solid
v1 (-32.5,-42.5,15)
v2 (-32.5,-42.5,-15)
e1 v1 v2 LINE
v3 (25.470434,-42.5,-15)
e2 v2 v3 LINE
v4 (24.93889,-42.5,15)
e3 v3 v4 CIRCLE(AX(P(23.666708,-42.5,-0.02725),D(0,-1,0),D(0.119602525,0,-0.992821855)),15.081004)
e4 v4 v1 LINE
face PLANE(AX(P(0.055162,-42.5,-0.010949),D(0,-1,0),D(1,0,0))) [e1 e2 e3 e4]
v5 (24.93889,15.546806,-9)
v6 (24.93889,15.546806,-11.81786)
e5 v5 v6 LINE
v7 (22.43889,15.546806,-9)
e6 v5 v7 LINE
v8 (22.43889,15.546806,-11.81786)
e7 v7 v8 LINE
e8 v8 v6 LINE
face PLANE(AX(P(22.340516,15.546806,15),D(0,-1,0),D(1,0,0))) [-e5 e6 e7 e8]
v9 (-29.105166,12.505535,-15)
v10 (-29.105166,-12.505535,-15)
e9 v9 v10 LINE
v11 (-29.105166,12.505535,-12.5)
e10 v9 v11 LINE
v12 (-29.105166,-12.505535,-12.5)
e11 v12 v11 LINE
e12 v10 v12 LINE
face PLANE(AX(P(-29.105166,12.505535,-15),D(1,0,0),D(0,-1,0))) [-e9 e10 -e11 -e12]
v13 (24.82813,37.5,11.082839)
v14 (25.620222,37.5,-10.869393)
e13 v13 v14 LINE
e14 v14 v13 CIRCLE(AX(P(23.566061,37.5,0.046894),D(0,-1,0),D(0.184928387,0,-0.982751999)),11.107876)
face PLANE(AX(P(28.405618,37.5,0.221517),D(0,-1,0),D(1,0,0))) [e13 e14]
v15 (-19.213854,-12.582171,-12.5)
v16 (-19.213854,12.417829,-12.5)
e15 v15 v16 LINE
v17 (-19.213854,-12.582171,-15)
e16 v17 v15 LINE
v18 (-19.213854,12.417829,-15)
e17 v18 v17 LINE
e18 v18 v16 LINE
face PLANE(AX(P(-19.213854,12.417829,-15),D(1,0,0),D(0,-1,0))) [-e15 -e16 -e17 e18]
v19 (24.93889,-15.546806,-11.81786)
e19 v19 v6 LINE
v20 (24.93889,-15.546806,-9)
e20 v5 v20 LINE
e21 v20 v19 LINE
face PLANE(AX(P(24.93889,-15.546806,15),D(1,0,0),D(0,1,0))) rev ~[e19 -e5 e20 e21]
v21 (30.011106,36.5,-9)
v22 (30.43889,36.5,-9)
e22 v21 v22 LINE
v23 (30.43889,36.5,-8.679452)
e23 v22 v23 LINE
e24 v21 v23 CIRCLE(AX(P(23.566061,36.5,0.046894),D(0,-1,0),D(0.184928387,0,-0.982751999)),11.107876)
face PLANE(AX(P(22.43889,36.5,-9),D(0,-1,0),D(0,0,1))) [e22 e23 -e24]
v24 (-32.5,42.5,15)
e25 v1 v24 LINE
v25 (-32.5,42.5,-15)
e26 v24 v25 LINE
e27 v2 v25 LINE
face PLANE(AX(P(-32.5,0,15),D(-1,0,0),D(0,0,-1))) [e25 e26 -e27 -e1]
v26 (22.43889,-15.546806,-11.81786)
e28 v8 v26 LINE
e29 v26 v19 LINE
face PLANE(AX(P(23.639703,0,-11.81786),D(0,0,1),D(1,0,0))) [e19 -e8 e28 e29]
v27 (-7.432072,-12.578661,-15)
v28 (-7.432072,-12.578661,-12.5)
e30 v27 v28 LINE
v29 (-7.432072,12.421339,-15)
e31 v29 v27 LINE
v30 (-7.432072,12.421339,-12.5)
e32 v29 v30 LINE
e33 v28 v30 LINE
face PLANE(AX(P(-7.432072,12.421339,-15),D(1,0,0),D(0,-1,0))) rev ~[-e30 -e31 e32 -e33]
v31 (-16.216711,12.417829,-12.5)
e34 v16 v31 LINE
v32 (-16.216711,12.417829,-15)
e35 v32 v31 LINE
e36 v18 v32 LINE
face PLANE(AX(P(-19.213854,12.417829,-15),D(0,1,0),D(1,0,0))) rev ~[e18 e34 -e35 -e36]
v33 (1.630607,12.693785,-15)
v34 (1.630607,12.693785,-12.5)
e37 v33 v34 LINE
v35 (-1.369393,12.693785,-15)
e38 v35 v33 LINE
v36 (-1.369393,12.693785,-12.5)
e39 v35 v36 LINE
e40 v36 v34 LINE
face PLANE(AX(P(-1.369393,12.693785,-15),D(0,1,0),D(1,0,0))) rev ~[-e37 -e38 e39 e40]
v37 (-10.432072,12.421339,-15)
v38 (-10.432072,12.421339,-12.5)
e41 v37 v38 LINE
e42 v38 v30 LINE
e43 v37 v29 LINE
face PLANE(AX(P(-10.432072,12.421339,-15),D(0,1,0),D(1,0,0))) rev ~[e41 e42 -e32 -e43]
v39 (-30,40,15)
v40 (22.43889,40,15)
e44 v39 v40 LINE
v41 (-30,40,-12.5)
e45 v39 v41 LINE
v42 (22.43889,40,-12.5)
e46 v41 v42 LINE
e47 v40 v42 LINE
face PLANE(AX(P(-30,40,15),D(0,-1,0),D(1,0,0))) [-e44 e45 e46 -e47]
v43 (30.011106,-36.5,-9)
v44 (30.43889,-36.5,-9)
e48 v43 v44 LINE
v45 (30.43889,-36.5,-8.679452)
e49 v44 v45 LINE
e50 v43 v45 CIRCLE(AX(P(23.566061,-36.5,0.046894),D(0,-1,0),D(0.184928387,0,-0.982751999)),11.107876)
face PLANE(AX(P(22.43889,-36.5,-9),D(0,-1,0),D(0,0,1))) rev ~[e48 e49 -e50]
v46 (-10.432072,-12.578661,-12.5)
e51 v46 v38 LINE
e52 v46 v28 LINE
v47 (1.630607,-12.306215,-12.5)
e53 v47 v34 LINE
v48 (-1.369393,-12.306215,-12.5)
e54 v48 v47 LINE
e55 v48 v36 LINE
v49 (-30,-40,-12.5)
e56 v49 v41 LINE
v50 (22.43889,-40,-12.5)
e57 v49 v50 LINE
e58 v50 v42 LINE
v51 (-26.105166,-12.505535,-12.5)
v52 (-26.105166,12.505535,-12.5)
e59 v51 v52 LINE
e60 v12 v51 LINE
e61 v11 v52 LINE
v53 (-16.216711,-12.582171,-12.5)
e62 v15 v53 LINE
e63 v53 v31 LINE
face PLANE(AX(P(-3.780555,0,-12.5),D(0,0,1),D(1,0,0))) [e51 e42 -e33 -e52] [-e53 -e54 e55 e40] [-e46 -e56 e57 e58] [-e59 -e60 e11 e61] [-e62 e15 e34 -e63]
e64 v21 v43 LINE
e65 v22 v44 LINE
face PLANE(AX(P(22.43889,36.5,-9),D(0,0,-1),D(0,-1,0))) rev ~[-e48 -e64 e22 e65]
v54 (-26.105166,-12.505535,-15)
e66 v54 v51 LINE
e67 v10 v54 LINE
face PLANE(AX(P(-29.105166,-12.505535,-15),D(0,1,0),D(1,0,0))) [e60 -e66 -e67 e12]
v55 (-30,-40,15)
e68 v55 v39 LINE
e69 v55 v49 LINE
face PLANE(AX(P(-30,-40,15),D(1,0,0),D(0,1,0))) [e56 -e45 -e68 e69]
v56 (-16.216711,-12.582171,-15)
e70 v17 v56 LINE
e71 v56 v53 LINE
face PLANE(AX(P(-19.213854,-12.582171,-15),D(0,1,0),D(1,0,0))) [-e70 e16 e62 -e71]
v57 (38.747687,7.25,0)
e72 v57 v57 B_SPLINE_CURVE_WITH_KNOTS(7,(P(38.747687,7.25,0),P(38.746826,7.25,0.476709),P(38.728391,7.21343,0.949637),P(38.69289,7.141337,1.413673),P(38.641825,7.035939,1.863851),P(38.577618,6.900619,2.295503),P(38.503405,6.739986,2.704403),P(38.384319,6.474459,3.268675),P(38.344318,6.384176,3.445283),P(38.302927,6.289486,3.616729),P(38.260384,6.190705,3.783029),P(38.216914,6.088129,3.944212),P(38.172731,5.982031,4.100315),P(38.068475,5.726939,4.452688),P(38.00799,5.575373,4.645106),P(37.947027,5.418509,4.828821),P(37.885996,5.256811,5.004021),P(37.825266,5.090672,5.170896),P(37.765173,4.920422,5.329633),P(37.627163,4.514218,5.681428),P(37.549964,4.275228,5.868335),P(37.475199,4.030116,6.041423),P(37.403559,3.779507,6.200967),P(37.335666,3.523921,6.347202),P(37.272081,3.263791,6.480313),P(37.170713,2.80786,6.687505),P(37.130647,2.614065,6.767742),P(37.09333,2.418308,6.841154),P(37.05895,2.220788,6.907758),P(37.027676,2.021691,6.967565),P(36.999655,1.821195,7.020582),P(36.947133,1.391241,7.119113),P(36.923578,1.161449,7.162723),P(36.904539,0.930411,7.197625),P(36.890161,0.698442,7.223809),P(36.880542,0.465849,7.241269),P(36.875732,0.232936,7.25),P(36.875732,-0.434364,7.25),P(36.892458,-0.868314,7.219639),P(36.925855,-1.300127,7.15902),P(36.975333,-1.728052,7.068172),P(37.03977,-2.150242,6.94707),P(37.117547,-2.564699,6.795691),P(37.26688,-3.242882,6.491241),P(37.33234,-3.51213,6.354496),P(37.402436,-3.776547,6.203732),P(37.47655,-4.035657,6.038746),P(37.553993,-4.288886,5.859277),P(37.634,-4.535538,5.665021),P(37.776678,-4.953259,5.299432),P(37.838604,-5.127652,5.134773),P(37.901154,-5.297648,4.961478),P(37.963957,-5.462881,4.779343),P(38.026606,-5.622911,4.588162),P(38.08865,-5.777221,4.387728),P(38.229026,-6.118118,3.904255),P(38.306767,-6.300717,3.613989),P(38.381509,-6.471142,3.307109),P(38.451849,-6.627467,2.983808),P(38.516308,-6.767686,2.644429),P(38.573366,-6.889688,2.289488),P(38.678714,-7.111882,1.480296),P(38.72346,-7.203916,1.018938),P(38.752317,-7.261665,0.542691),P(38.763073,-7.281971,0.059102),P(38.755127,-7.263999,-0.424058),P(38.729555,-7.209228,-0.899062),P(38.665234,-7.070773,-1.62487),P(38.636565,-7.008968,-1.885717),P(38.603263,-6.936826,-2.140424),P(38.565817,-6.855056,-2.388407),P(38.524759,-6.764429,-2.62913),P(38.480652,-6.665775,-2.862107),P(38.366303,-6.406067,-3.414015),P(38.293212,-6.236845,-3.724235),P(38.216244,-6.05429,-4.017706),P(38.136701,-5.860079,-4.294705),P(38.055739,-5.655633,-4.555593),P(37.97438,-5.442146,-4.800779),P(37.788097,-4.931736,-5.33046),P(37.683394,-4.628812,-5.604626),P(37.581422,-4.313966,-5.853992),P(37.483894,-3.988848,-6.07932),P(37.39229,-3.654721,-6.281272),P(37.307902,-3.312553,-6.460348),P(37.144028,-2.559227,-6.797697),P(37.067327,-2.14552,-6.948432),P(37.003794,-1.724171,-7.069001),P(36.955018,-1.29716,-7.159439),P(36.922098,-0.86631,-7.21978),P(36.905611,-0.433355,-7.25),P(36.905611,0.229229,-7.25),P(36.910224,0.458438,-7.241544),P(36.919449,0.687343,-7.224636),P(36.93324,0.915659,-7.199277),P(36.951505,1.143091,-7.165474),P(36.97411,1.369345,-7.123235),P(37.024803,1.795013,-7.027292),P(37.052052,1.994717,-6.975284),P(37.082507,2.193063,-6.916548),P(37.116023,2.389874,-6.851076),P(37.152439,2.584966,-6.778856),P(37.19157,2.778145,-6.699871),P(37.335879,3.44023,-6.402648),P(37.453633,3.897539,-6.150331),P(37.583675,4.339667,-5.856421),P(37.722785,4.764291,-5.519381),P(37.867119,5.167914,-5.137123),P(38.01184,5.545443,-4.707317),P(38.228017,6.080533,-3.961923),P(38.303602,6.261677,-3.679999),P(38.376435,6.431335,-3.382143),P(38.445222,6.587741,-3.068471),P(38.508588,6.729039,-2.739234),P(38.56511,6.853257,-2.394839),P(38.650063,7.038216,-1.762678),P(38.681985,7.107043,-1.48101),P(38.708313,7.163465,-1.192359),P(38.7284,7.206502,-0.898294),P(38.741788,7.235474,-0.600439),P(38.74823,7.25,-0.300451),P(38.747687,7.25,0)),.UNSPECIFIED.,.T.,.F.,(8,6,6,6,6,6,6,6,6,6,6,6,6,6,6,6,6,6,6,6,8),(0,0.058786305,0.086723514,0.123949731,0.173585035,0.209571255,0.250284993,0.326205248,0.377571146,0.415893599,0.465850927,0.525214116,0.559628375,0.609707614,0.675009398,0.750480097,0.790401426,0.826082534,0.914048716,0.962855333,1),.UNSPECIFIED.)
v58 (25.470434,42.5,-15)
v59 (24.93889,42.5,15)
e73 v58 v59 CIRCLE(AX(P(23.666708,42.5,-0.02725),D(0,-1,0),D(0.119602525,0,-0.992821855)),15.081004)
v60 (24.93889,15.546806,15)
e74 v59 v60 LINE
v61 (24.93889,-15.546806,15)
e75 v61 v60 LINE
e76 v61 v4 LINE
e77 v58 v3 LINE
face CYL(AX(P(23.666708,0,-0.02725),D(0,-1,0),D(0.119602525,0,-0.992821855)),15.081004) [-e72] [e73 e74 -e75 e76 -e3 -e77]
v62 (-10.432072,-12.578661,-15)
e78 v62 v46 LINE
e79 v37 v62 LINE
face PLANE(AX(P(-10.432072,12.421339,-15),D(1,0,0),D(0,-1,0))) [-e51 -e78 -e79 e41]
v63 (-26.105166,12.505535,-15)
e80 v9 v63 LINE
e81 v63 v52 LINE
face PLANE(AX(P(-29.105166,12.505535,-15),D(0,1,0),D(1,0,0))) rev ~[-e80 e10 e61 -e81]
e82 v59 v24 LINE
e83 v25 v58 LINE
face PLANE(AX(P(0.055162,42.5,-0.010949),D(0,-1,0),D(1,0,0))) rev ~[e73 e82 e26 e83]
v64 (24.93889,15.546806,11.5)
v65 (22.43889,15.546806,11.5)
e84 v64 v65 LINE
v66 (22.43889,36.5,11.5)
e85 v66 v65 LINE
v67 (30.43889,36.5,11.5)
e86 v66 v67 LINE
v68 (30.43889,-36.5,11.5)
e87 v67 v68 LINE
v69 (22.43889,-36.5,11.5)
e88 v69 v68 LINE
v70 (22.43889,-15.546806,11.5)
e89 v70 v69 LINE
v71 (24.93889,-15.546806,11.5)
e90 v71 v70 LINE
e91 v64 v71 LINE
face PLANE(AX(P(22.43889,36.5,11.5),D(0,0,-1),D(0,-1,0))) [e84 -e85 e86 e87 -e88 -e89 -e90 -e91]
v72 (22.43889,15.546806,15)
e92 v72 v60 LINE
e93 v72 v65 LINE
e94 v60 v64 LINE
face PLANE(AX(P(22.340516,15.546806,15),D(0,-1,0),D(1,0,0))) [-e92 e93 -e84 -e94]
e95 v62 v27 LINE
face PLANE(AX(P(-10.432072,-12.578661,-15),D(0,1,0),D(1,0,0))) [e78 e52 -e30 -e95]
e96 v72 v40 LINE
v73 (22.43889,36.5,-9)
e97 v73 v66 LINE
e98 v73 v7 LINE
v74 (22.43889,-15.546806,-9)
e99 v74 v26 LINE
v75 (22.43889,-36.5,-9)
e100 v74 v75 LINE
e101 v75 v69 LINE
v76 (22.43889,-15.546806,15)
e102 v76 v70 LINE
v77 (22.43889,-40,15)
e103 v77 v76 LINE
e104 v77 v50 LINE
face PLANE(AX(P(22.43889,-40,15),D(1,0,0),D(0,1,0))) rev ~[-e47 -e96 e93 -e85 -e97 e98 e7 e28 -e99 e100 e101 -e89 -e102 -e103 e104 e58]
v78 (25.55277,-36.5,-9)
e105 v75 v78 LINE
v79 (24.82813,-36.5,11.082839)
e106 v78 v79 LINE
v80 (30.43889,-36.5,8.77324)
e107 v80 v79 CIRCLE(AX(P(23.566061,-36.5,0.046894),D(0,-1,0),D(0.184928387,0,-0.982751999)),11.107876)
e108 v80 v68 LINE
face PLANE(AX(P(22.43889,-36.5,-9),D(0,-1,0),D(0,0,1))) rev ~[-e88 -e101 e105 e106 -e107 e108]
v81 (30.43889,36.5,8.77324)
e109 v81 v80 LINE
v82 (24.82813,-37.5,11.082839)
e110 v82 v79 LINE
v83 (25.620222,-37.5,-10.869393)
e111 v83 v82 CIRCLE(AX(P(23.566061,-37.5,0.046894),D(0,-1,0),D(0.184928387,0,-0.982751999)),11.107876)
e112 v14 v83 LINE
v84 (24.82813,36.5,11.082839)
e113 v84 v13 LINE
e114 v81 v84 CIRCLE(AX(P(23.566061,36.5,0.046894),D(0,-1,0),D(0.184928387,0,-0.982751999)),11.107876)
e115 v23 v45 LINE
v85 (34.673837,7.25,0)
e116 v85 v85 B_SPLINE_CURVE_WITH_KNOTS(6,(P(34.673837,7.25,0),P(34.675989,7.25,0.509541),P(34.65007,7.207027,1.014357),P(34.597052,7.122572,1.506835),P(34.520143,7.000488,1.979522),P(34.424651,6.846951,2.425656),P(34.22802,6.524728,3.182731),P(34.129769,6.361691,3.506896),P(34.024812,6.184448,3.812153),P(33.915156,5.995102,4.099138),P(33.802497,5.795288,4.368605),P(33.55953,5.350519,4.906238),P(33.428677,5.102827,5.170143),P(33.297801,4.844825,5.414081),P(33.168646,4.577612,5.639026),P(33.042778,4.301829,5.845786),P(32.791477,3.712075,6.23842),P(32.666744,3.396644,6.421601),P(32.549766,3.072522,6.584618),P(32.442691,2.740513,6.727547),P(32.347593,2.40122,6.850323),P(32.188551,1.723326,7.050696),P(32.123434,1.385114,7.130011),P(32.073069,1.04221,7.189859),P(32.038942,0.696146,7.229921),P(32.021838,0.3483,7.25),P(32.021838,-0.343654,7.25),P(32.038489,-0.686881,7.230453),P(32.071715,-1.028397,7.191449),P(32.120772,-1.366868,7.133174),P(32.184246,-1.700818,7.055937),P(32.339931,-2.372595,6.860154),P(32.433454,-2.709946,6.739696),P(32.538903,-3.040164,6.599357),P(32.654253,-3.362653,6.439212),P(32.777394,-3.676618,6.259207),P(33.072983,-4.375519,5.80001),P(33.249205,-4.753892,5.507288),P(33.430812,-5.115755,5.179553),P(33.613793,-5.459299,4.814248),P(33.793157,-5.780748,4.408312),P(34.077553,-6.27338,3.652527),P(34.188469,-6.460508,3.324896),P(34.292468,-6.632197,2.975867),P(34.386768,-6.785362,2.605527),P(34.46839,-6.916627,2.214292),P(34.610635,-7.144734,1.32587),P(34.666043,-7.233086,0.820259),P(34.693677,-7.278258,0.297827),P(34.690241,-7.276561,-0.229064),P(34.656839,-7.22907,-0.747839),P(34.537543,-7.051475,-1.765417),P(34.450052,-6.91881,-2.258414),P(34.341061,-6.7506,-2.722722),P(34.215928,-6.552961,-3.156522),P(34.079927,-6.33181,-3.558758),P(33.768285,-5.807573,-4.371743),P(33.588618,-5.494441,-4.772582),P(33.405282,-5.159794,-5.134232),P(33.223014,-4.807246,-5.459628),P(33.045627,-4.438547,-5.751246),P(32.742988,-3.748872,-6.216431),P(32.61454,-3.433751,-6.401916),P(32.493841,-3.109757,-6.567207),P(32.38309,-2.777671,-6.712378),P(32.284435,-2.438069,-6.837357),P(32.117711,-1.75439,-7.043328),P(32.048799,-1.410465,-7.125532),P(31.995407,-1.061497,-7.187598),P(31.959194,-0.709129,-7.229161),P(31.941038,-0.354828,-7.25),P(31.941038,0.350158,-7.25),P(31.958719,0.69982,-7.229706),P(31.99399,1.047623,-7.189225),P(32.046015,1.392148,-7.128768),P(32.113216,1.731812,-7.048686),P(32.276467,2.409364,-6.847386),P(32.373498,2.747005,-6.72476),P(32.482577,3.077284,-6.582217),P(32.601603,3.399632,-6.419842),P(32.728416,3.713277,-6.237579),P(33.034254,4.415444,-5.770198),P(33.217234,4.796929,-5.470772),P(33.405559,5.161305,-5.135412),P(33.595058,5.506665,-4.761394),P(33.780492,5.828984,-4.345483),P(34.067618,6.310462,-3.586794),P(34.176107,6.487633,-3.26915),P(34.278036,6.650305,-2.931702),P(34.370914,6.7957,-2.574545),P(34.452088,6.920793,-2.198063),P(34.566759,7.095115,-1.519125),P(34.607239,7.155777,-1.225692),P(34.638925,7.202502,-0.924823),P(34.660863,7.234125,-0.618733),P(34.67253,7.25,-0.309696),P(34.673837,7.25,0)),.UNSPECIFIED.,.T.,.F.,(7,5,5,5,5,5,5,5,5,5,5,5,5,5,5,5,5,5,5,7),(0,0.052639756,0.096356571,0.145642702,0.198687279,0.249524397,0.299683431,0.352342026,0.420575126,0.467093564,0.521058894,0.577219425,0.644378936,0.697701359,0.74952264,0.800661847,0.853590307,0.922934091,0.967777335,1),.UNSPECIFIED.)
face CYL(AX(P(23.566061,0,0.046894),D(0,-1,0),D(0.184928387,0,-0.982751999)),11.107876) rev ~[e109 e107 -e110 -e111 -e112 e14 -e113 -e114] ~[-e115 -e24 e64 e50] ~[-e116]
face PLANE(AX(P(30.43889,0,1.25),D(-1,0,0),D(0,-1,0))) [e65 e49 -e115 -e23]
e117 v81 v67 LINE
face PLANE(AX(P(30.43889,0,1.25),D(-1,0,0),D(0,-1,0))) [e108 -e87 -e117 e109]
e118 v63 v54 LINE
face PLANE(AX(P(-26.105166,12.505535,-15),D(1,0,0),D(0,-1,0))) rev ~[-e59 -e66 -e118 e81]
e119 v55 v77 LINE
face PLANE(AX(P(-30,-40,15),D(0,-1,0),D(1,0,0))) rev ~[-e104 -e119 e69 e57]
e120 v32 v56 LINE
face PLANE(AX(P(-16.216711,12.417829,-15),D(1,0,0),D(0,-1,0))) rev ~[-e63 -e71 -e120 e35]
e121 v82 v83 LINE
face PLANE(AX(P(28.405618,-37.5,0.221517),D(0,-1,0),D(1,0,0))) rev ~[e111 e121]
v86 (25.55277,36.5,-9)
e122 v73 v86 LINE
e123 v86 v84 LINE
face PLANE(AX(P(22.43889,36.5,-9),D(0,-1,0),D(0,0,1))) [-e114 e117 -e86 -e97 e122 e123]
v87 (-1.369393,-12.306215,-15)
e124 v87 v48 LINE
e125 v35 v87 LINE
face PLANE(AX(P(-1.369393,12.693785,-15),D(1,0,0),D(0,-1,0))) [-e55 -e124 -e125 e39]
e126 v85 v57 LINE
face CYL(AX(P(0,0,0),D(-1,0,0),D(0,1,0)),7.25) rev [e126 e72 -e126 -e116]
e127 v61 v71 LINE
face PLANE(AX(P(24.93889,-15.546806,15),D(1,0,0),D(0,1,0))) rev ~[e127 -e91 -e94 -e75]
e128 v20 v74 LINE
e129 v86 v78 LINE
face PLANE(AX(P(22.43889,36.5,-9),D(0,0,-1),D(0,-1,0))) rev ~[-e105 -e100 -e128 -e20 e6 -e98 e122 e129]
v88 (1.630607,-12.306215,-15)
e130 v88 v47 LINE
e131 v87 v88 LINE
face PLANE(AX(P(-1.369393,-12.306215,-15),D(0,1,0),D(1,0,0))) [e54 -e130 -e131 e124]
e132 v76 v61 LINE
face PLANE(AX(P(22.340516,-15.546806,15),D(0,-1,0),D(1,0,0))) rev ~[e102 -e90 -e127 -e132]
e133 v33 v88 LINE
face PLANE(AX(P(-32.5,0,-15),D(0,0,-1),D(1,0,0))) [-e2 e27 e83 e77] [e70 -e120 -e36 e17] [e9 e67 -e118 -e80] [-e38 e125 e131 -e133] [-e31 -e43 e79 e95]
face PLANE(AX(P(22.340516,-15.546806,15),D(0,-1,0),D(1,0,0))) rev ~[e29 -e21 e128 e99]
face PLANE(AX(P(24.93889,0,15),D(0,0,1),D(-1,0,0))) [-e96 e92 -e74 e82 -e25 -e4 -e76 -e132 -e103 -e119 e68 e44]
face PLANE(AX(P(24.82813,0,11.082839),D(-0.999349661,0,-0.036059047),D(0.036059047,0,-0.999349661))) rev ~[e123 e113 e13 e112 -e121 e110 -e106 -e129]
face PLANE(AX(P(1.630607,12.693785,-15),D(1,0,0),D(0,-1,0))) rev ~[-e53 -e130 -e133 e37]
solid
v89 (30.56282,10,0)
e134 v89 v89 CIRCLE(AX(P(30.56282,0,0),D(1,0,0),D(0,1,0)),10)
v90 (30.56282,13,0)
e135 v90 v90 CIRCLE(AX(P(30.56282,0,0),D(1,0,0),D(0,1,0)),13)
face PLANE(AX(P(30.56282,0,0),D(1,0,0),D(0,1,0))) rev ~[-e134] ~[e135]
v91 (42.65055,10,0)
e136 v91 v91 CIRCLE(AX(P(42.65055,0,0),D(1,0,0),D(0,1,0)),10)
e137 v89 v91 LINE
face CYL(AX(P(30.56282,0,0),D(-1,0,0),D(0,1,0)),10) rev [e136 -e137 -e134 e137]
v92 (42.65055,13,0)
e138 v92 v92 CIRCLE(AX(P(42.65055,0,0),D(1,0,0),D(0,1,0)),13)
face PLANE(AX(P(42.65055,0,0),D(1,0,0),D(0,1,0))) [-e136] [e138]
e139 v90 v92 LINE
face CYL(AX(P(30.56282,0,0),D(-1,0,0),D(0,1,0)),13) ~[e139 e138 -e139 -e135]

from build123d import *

# Parameters (mm, degrees)
F1_DEPTH  = 42.5
F2_R      = 7.25
F3_DEPTH  = 38.7487115805
F4_W      = 3
F4_H      = 25.0110699423
F4_W_2    = 2.9971426107
F4_H_2    = 25
F5_DEPTH  = 30.0010001
F7_W      = 52.4388903172
F7_H      = 80
F7_W_2    = 2.9971426107
F7_H_2    = 25
F7_W_3    = 3
F7_H_3    = 25.0110699423
F8_DEPTH  = 27.5
F10_DEPTH = 37.5
F11_W     = 73
F11_H     = 20.5
F12_DEPTH = 8
F13_W     = 2.5983742954
F13_H     = 31.0936123133
F14_DEPTH = 26.81786
F16_START = 60.56282
F15_R     = 13
F15_R_2   = 10
F16_DEPTH = 12.08773


# Not quite as in the source:
# - a feature names something its author has since deleted; it is built from what else it names


with BuildPart() as f1:
    # F0 (on Front) → F1 (new body, symmetric)
    with BuildSketch(Plane.XZ):
        with BuildLine():
            Line((-32.5, -15), (25.4704337567, -15))
            ThreePointArc((25.4704337567, -15), (38.745344936, 0.2399153721), (24.9388903172, 15))
            Line((24.9388903172, 15), (22.3945248872, 15))
            Line((22.3945248872, 15), (-32.5, 15))
            Line((-32.5, 15), (-32.5, -15))
        make_face()
        with BuildLine():
            Line((25.399065212, -10.9720011933), (25.0102588618, 10.9720011933))
            ThreePointArc((25.0102588618, 10.9720011933), (34.7459726513, 0.1690540354), (25.399065212, -10.9720011933))
        make_face(mode=Mode.SUBTRACT)
        with BuildLine():
            ThreePointArc((25.399065212, -10.9720011933), (34.7459726513, 0.1690540354), (25.0102588618, 10.9720011933))
            Line((25.0102588618, 10.9720011933), (25.399065212, -10.9720011933))
        make_face()
    extrude(amount=F1_DEPTH, both=True)

    # F2 (on Right) → F3 (cut, through all)
    with BuildSketch(Plane.YZ):
        Circle(F2_R)
    extrude(amount=F3_DEPTH, mode=Mode.SUBTRACT)

    # F4 (on face) → F5 (cut, through all)
    with BuildSketch(Plane(origin=(0, 0, -15), x_dir=(1, 0, 0), z_dir=(0, 0, -1))):
        with Locations((-27.6051664799, 0)):
            Rectangle(F4_W, F4_H)
        with Locations((-17.7152827382, 0.0821705908)):
            Rectangle(F4_W_2, F4_H_2)
        with Locations((-8.9320717379, 0.0786611254)):
            Rectangle(F4_W, F4_H_2)
        with Locations((0.1306068152, -0.1937846464)):
            Rectangle(F4_W, F4_H_2)
    extrude(amount=-F5_DEPTH, mode=Mode.SUBTRACT)

    # F7 (on face) → F8 (cut)
    with BuildSketch(Plane.XY.offset(15)):
        with Locations((-3.7805548414, 0)):
            Rectangle(F7_W, F7_H)
        with Locations((-17.7152827382, -0.0821705908)):
            Rectangle(F7_W_2, F7_H_2, mode=Mode.SUBTRACT)
        with Locations((-8.9320717379, -0.0786611254)):
            Rectangle(F7_W_3, F7_H_2, mode=Mode.SUBTRACT)
        with Locations((-27.6051664799, 0)):
            Rectangle(F7_W_3, F7_H_3, mode=Mode.SUBTRACT)
        with Locations((0.1306068152, 0.1937846464)):
            Rectangle(F7_W_3, F7_H_2, mode=Mode.SUBTRACT)
    extrude(amount=-F8_DEPTH, mode=Mode.SUBTRACT)

    # F9 (on Front) → F10 (cut, symmetric)
    with BuildSketch(Plane.XZ):
        with BuildLine():
            Line((24.8281303793, 11.0828392208), (25.6202220917, -10.8693931252))
            ThreePointArc((25.6202220917, -10.8693931252), (34.6667124862, 0.4474334863), (24.8281303793, 11.0828392208))
        make_face()
    extrude(amount=F10_DEPTH, both=True, mode=Mode.SUBTRACT)

    # F11 (on face) → F12 (cut)
    with BuildSketch(Plane(origin=(22.4388903172, 0, 0), x_dir=(0, -1, 0), z_dir=(-1, 0, 0))):
        with Locations((0, 1.25)):
            Rectangle(F11_W, F11_H)
    extrude(amount=-F12_DEPTH, mode=Mode.SUBTRACT)

    # F13 (on face) → F14 (cut)
    with BuildSketch(Plane.XY.offset(15)):
        with Locations((23.6397031695, 0)):
            Rectangle(F13_W, F13_H)
    extrude(amount=-F14_DEPTH, mode=Mode.SUBTRACT)


with BuildPart() as f16:
    # F15 (on face) → F16 (new body)
    with BuildSketch(Plane.YZ.offset(-30).offset(F16_START)):
        Circle(F15_R)
        Circle(F15_R_2, mode=Mode.SUBTRACT)
    extrude(amount=F16_DEPTH)


solid = Compound([f1.part, f16.part])
